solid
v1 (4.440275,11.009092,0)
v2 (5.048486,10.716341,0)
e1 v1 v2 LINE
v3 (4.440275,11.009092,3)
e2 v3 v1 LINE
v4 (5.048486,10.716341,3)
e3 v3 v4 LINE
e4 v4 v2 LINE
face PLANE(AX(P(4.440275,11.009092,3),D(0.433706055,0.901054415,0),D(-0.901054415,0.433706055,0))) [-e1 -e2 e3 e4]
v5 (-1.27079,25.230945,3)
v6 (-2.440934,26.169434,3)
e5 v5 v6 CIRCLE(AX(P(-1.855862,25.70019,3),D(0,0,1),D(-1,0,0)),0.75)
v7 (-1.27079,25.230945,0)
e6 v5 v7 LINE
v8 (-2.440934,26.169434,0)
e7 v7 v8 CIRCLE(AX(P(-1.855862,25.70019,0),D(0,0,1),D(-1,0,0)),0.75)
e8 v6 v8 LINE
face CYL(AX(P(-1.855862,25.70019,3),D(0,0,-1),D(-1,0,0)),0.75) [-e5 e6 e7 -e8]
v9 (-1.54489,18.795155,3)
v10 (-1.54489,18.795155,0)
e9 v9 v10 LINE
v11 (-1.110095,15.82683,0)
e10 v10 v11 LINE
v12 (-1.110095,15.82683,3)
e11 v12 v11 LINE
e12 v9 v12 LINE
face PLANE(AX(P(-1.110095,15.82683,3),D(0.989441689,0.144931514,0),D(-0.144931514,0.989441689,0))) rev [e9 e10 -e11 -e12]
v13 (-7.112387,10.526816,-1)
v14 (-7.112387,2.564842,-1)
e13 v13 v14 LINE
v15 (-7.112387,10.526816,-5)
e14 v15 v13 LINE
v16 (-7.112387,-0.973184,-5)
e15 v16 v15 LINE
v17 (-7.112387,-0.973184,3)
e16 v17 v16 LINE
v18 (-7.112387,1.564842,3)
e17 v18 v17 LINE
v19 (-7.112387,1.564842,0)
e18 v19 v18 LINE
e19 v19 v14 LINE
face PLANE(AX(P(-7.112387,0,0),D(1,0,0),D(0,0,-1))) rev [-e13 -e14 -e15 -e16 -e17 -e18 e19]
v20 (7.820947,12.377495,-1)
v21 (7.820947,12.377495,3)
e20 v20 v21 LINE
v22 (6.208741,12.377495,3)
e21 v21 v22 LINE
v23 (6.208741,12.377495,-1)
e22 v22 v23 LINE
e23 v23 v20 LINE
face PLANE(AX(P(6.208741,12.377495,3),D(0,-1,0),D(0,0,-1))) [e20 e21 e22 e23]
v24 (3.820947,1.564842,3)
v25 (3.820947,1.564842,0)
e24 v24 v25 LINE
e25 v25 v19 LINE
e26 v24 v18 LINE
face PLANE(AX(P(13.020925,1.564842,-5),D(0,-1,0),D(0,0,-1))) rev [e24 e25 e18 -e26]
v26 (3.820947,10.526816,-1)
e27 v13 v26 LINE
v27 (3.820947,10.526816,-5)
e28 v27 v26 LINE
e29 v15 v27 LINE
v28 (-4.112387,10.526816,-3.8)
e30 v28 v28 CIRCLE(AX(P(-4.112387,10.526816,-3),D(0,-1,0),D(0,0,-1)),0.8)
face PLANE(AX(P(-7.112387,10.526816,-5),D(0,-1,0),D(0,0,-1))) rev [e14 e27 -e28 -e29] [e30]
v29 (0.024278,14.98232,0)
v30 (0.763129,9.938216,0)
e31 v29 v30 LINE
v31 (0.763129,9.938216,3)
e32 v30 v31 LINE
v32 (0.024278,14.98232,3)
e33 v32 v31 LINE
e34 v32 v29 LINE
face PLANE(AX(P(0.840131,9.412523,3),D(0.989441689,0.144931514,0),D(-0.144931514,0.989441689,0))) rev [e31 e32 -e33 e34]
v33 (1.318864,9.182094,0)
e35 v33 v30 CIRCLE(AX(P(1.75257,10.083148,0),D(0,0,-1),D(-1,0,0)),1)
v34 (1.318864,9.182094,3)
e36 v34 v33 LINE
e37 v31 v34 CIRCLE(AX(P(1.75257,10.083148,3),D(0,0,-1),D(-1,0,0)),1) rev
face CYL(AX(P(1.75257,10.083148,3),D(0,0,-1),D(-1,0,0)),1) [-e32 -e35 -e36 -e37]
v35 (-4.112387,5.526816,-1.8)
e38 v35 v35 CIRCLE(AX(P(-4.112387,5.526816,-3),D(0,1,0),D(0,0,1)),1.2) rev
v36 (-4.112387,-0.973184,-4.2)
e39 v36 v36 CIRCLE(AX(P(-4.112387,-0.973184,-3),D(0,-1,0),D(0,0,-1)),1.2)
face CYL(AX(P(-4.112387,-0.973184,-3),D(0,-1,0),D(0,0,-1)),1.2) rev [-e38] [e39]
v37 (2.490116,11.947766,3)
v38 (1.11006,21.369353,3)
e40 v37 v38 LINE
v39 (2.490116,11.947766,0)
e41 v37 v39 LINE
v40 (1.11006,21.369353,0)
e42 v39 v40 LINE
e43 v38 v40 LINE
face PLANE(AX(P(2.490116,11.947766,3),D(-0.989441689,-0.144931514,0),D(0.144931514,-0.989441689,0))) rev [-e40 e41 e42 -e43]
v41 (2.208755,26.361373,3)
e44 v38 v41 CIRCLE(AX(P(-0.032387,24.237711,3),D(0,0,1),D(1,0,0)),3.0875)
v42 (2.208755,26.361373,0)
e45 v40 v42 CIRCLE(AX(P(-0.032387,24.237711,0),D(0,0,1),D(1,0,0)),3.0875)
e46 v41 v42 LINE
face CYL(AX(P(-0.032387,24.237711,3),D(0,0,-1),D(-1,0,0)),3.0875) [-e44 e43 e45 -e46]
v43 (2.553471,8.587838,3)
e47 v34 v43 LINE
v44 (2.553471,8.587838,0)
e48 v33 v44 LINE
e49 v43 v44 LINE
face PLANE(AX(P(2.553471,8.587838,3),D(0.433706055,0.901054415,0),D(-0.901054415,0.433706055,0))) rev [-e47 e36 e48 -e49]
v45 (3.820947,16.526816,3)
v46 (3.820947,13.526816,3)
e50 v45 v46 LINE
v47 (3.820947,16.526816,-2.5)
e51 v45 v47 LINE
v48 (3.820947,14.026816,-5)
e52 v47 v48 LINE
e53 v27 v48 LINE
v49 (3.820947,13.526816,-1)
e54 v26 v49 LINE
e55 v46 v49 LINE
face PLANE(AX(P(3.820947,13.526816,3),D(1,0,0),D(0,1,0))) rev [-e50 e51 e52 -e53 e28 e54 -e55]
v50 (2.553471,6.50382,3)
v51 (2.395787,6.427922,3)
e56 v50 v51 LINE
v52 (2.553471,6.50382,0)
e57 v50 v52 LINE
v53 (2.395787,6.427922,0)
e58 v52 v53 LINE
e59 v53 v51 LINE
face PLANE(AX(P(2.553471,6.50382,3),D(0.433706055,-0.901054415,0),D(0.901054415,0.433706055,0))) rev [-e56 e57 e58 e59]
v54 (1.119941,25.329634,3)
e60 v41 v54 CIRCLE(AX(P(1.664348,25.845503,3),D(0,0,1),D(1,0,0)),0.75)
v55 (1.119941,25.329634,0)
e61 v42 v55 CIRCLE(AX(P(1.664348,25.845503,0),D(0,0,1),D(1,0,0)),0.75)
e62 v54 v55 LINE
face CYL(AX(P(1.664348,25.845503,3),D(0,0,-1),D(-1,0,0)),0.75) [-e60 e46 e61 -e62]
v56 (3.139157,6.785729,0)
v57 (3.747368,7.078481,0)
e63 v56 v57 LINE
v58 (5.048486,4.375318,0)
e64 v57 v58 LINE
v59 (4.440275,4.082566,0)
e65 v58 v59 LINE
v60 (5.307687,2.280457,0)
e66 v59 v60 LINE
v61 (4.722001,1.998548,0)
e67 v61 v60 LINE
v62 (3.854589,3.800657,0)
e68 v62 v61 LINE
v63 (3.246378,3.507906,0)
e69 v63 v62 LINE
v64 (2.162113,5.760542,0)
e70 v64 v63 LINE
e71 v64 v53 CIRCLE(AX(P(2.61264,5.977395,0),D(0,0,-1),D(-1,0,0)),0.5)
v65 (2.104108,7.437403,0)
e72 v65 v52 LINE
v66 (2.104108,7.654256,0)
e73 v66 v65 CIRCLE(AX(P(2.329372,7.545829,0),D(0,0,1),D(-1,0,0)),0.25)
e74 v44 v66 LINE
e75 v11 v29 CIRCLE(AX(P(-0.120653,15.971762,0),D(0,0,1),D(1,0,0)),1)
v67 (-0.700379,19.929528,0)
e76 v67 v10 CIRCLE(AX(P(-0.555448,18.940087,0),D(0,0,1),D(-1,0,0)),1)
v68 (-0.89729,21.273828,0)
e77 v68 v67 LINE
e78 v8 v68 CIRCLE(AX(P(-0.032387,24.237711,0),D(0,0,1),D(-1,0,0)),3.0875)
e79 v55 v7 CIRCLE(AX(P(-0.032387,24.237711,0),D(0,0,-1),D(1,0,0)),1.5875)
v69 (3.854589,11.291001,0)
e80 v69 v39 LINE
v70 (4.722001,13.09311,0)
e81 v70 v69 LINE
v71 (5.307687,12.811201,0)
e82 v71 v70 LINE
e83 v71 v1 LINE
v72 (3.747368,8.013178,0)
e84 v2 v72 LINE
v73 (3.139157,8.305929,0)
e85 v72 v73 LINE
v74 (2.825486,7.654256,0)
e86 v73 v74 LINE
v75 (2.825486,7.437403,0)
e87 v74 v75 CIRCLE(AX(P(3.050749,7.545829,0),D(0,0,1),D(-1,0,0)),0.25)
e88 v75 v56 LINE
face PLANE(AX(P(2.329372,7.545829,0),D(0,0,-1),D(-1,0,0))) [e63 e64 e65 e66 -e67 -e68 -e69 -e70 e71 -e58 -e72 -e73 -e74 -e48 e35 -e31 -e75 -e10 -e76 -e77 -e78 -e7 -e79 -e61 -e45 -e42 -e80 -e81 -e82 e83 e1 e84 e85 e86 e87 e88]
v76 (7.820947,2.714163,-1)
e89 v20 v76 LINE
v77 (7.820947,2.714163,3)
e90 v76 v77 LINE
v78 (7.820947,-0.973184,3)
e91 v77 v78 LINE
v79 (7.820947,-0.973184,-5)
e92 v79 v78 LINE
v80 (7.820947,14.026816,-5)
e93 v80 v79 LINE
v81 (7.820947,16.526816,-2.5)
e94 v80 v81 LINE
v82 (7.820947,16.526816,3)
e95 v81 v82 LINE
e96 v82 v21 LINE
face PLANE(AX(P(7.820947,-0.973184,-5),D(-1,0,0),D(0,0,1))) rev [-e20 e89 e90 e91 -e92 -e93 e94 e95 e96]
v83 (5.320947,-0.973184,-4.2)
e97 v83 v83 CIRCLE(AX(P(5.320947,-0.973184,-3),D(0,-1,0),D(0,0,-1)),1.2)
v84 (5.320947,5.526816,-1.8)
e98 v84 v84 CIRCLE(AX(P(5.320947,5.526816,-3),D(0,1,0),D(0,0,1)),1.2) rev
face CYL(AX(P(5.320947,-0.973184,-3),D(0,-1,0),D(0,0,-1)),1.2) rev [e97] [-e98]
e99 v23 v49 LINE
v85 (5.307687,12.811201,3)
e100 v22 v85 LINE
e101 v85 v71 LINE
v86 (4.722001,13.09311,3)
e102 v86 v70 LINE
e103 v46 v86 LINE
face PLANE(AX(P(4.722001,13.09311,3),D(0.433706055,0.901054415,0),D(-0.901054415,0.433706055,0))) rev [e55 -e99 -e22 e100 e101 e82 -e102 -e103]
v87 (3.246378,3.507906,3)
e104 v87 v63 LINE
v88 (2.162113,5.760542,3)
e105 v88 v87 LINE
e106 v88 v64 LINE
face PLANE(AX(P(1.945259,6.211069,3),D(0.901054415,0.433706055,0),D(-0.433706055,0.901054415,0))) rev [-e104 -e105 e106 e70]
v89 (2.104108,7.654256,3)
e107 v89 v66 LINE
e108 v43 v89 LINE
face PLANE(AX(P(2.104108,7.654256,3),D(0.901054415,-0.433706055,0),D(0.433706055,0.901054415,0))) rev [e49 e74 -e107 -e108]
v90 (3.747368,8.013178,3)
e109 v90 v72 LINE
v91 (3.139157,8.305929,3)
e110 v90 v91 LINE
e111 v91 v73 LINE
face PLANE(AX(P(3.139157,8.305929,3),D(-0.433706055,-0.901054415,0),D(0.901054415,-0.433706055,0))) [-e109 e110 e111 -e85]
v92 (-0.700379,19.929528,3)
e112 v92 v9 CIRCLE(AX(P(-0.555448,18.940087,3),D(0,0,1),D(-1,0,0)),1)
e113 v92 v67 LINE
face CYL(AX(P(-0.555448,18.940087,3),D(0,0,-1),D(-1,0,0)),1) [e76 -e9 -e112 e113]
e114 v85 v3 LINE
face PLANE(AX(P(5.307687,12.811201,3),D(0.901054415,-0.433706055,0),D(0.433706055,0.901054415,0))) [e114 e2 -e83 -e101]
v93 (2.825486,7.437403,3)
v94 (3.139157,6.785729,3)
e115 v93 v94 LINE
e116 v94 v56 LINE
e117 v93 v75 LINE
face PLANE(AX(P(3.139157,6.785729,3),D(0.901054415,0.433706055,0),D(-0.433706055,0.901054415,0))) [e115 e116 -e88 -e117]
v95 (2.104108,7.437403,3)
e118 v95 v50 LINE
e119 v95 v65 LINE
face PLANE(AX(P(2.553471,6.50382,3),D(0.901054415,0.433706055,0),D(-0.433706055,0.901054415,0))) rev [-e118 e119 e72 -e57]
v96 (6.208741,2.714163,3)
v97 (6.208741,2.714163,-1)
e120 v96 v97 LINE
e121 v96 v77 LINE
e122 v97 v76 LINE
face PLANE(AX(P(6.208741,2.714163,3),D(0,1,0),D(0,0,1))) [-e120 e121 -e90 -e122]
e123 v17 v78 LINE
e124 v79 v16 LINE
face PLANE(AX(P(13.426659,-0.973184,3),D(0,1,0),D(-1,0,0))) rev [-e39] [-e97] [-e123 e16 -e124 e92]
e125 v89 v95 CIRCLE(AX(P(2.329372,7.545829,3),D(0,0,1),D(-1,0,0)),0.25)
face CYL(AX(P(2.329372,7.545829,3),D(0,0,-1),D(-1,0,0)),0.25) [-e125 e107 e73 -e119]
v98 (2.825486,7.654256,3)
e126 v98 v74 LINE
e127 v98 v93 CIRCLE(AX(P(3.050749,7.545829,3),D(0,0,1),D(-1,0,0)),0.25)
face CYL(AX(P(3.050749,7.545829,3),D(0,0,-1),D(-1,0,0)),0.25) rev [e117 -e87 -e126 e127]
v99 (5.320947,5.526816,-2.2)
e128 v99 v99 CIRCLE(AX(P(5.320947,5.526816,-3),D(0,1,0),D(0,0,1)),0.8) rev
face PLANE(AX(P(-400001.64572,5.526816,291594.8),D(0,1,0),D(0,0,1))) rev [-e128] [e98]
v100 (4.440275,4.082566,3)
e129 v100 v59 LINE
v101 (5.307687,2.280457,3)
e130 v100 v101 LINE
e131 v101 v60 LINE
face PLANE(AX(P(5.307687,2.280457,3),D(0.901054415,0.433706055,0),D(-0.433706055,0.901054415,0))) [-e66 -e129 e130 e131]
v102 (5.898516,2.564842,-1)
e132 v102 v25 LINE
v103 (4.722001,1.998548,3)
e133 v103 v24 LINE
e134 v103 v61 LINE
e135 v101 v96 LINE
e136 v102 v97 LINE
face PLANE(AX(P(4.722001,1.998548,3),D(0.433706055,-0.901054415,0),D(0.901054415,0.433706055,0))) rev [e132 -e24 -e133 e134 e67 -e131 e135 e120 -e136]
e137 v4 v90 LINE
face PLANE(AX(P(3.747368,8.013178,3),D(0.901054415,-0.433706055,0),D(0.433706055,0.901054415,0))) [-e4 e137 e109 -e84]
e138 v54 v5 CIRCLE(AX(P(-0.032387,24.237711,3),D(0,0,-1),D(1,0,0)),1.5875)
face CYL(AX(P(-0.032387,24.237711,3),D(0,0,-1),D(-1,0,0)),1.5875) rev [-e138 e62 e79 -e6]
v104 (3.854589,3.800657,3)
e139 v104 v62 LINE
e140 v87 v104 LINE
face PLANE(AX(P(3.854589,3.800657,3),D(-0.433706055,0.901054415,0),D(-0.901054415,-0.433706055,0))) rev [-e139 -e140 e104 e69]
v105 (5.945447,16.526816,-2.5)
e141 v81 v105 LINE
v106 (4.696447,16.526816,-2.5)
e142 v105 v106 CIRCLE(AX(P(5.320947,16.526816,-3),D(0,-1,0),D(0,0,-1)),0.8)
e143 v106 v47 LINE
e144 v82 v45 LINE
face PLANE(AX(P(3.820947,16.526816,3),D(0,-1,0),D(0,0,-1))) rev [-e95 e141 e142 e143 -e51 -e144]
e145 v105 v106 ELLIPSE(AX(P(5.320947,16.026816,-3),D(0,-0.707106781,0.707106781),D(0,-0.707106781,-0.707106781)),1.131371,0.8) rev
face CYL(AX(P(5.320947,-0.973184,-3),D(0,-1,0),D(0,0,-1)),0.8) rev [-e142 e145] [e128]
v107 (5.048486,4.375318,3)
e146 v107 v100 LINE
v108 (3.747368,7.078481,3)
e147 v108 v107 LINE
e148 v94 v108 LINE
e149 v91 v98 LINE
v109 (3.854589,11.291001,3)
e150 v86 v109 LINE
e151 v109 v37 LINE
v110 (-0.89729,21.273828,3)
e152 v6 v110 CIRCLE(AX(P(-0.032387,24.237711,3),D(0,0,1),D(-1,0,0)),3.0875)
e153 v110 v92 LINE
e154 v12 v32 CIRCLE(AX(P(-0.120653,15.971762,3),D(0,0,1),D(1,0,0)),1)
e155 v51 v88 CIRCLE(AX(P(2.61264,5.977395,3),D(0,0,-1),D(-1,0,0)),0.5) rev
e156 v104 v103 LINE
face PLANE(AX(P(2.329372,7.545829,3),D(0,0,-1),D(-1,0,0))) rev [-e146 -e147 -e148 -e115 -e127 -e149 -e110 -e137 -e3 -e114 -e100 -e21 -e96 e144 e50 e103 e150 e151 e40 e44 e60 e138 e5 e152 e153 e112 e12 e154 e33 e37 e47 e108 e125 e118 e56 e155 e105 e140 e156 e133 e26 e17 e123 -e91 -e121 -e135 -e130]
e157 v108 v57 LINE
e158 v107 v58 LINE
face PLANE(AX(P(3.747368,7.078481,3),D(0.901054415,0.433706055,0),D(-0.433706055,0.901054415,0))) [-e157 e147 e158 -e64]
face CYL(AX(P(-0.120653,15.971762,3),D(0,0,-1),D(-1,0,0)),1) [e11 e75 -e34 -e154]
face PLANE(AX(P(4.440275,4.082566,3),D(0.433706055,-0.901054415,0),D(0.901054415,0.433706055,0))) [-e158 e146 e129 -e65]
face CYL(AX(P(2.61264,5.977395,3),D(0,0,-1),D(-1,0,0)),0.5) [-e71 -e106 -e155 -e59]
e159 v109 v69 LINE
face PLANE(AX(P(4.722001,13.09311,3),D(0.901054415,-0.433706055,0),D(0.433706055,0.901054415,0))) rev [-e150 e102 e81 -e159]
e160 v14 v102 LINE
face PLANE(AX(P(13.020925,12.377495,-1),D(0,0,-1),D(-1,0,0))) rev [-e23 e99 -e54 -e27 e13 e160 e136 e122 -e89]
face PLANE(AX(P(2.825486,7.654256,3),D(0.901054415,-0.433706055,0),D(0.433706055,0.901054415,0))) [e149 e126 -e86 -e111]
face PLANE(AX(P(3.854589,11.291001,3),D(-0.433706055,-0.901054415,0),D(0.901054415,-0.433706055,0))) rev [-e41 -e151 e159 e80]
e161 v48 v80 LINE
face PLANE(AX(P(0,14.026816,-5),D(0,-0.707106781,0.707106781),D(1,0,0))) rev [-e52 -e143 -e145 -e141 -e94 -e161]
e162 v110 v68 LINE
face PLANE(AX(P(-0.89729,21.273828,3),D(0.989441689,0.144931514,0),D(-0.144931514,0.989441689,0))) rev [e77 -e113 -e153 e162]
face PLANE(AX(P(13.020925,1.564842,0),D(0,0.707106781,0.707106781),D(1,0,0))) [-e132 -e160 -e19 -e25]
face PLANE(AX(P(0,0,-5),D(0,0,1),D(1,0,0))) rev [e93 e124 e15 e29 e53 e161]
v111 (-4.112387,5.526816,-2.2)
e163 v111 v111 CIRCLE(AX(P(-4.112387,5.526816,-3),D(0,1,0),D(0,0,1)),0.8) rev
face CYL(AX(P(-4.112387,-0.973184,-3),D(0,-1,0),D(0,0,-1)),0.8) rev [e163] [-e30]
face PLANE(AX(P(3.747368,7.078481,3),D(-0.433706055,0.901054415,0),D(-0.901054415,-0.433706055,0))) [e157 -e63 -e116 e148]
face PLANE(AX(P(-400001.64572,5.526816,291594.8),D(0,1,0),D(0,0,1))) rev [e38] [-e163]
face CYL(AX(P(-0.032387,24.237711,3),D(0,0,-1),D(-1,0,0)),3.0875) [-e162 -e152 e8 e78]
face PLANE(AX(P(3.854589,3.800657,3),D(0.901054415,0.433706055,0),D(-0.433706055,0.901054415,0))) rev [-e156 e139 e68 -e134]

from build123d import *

# Parameters (mm, degrees)
BOSS_SWITCH_BODY_DEPTH        = 3
SKETCH1_W                     = 4
SKETCH1_H                     = 3.687347025
SKETCH1_H_2                   = 4.149321045
BOSS_FLANGE_WIDTH_DEPTH       = 5
BOSS_FLANGE_HEIGHT_REACH      = 35.973
SKETCH2_W                     = 4
SKETCH2_H                     = 4.149321045
SKETCH2_W_2                   = 8
SKETCH2_H_2                   = 2.53802598
SKETCH17_W                    = 14.933333866
SKETCH17_H                    = 4
BOSS_FLANGE_SUPPORT_DEPTH     = 10.812652975
CUT_WALL_GAP_DEPTH            = 1
SKETCH26_W                    = 10.933333866
SKETCH26_H                    = 6
CUT_CAM_SLOPE_CLEARANCE_DEPTH = 31.059873248
TAP_DRILL_FOR_M2X0_4_TAP1_D   = 1.6
M2_CLEARANCE_HOLE2_D          = 2.4
M2_CLEARANCE_HOLE2_DEPTH      = 6.5
CHAMFER_FLANGE_SUPPORT_3_SIZE = 1
SKETCH25_W                    = 5.60571229
SKETCH25_H                    = 17.5
CUT_BASE_REMOVAL_DEPTH        = 3
CHAMFER8_SIZE                 = 2.5
FILLET1_R                     = 1
FILLET2_R                     = 0.5


with BuildPart() as part:
    # Sketch-SwitchBossUp → Boss-Switch Body (new body)
    with BuildSketch(Plane.XY):
        with BuildLine():
            Line((-0.897289862, 21.27382814), (-0.700379438, 19.929528492))
            ThreePointArc((-0.700379438, 19.929528492), (-1.357570909, 19.537245674), (-1.544889614, 18.795155289))
            Line((-1.544889614, 18.795155289), (-1.110095072, 15.826830221))
            ThreePointArc((-1.110095072, 15.826830221), (-0.717812255, 15.169638751), (0.02427813, 14.982320046))
            Line((0.02427813, 14.982320046), (0.840131285, 9.412522958))
            Line((0.840131285, 9.412522958), (1.945259485, 8.880589721))
            Line((1.945259485, 8.880589721), (2.553471215, 8.587838134))
            Line((2.553471215, 8.587838134), (2.104108424, 7.654255765))
            ThreePointArc((2.104108424, 7.654255765), (2.079372028, 7.545829251), (2.104108424, 7.437402737))
            Line((2.104108424, 7.437402737), (2.553471215, 6.503820369))
            Line((2.553471215, 6.503820369), (1.945259485, 6.211068782))
            Line((1.945259485, 6.211068782), (3.246377649, 3.507905538))
            Line((3.246377649, 3.507905538), (3.854589379, 3.800657125))
            Line((3.854589379, 3.800657125), (4.722001489, 1.998548296))
            Line((4.722001489, 1.998548296), (3.820947074, 1.564842241))
            Line((3.820947074, 1.564842241), (3.820947074, -0.973183739))
            Line((3.820947074, -0.973183739), (5.277352178, -0.973183739))
            Line((5.277352178, -0.973183739), (13.426659364, -0.973183739))
            Line((13.426659364, -0.973183739), (13.426659364, 16.526816261))
            Line((13.426659364, 16.526816261), (7.114618425, 16.526816261))
            Line((7.114618425, 16.526816261), (3.820947074, 16.526816261))
            Line((3.820947074, 16.526816261), (3.820947074, 13.526816261))
            Line((3.820947074, 13.526816261), (4.722001489, 13.093110206))
            Line((4.722001489, 13.093110206), (3.854589379, 11.291001377))
            Line((3.854589379, 11.291001377), (2.490115752, 11.94776579))
            Line((2.490115752, 11.94776579), (1.110059725, 21.369353491))
            ThreePointArc((1.110059725, 21.369353491), (2.982945849, 23.574065074), (2.208754741, 26.361372687))
            ThreePointArc((2.208754741, 26.361372687), (1.148478545, 26.389910192), (1.119941041, 25.329633996))
            ThreePointArc((1.119941041, 25.329633996), (0.033089246, 22.651561394), (-1.270789677, 25.230944933))
            ThreePointArc((-1.270789677, 25.230944933), (-1.386617314, 26.285261754), (-2.440934135, 26.169434117))
            ThreePointArc((-2.440934135, 26.169434117), (-2.976976555, 23.309245483), (-0.897289862, 21.27382814))
        make_face()
        with BuildLine():
            Line((6.208741273, 2.714163286), (10.695012416, 2.714163286))
            Line((10.695012416, 2.714163286), (10.695012416, 12.377495216))
            Line((10.695012416, 12.377495216), (6.208741273, 12.377495216))
            Line((6.208741273, 12.377495216), (5.307686858, 12.811201271))
            Line((5.307686858, 12.811201271), (4.440274749, 11.009092442))
            Line((4.440274749, 11.009092442), (5.048486478, 10.716340855))
            Line((5.048486478, 10.716340855), (3.747368314, 8.013177611))
            Line((3.747368314, 8.013177611), (3.139156584, 8.305929198))
            Line((3.139156584, 8.305929198), (2.825485502, 7.654255765))
            ThreePointArc((2.825485502, 7.654255765), (2.800749105, 7.545829251), (2.825485502, 7.437402737))
            Line((2.825485502, 7.437402737), (3.139156584, 6.785729304))
            Line((3.139156584, 6.785729304), (3.747368314, 7.078480891))
            Line((3.747368314, 7.078480891), (5.048486478, 4.375317648))
            Line((5.048486478, 4.375317648), (4.440274749, 4.082566061))
            Line((4.440274749, 4.082566061), (5.307686858, 2.280457231))
            Line((5.307686858, 2.280457231), (6.208741273, 2.714163286))
        make_face(mode=Mode.SUBTRACT)
    extrude(amount=BOSS_SWITCH_BODY_DEPTH)

    # Sketch1 → Boss-Flange Width (add)
    with BuildSketch(Plane(origin=(0, 0, 0), x_dir=(-1, 0, 0), z_dir=(0, 0, -1))):
        with Locations((-5.820947074, 0.870489774)):
            Rectangle(SKETCH1_W, SKETCH1_H)
        with Locations((-5.820947074, 14.452155739)):
            Rectangle(SKETCH1_W, SKETCH1_H_2)
    extrude(amount=BOSS_FLANGE_WIDTH_DEPTH)

    # Sketch2 → Boss-Flange Height (add, up to next)
    with BuildSketch(Plane(origin=(-7.112386792, 0, 0), x_dir=(0, 0, -1), z_dir=(1, 0, 0)), mode=Mode.PRIVATE) as boss_flange_height_sk1:
        with Locations((3, 14.452155739)):
            Rectangle(SKETCH2_W, SKETCH2_H)
    boss_flange_height_tool1 = extrude(boss_flange_height_sk1.sketch, amount=BOSS_FLANGE_HEIGHT_REACH, mode=Mode.PRIVATE) - part.part
    # Sketch2 → Boss-Flange Height (add, up to next)
    with BuildSketch(Plane(origin=(-7.112386792, 0, 0), x_dir=(0, 0, -1), z_dir=(1, 0, 0)), mode=Mode.PRIVATE) as boss_flange_height_sk2:
        with Locations((1, 0.295829251)):
            Rectangle(SKETCH2_W_2, SKETCH2_H_2)
    boss_flange_height_tool2 = extrude(boss_flange_height_sk2.sketch, amount=BOSS_FLANGE_HEIGHT_REACH, mode=Mode.PRIVATE) - part.part
    add(boss_flange_height_tool1.solids().sort_by_distance((-7.112387, 14.452156, -3))[0])
    add(boss_flange_height_tool2.solids().sort_by_distance((-7.112387, 0.295829, -1))[0])

    # Sketch17 → Boss-Flange Support (add)
    with BuildSketch(Plane.XZ.offset(-1.564842241)):
        with Locations((0.354280141, -3)):
            Rectangle(SKETCH17_W, SKETCH17_H)
    extrude(amount=-BOSS_FLANGE_SUPPORT_DEPTH)

    # Sketch27 → Cut-Wall Gap (cut)
    with BuildSketch(Plane.XY):
        Polygon((3.820947074, 13.526816261), (6.208741273, 12.377495216), (3.820947074, 12.377495216), align=None)
        Polygon((6.208741273, 2.714163286), (3.820947074, 2.714163286), (3.820947074, 1.564842241), align=None)
    extrude(amount=-CUT_WALL_GAP_DEPTH, mode=Mode.SUBTRACT)

    # Sketch26 → Cut-Cam Slope Clearance (cut, through all)
    with BuildSketch(Plane.XY.offset(-1)):
        with Locations((-1.645719859, 13.526816261)):
            Rectangle(SKETCH26_W, SKETCH26_H)
    extrude(amount=-CUT_CAM_SLOPE_CLEARANCE_DEPTH, mode=Mode.SUBTRACT)

    # Tap Drill for M2x0.4 Tap1 (through all)
    with Locations(Plane(origin=(0, -0.973183739, 0), x_dir=(-1, 0, 0), z_dir=(0, -1, 0))):
        with Locations((4.112386792, 3), (-5.320947074, 3)):
            Hole(TAP_DRILL_FOR_M2X0_4_TAP1_D / 2)

    # M2 Clearance Hole2
    with Locations(Plane.XZ.offset(0.973183739)):
        with Locations((-4.112386792, -3), (5.320947074, -3)):
            Hole(M2_CLEARANCE_HOLE2_D / 2, depth=M2_CLEARANCE_HOLE2_DEPTH)

    # Chamfer-Flange Support 3
    chamfer_flange_support_3_edges = [part.edges().sort_by_distance(p)[0] for p in [
        (-1.645719859, 1.564842241, -1),
    ]]
    chamfer(chamfer_flange_support_3_edges, length=CHAMFER_FLANGE_SUPPORT_3_SIZE)

    # Sketch25 → Cut-Base Removal (cut)
    with BuildSketch(Plane.XY.offset(3)):
        with Locations((10.623803219, 7.776816261)):
            Rectangle(SKETCH25_W, SKETCH25_H)
    extrude(amount=-CUT_BASE_REMOVAL_DEPTH, mode=Mode.SUBTRACT)

    # Chamfer8
    # the kernel refuses this chamfer: 2.5 mm, written as the material it takes off along each edge
    with BuildSketch(Plane(origin=(14.250154544, 16.526816261, -5), x_dir=(0, 0.027495876610586317, 0.9996219169112968), z_dir=(-1, 0, 0))) as chamfer8_piece_1:
        Polygon((CHAMFER8_SIZE * 0.999621916911, -CHAMFER8_SIZE * 0.0274958766106), (-CHAMFER8_SIZE * 0.0274958766106, -CHAMFER8_SIZE * 0.999621916911), (0, 0), align=None)
    extrude(amount=16.85841494, mode=Mode.SUBTRACT)

    # Fillet1
    fillet1_edges = [part.edges().sort_by_distance(p)[0] for p in [
        (0.840131285, 9.412522958, 1.5),
    ]]
    fillet(fillet1_edges, radius=FILLET1_R)

    # Fillet2
    fillet2_edges = [part.edges().sort_by_distance(p)[0] for p in [
        (1.945259485, 6.211068782, 1.5),
    ]]
    fillet(fillet2_edges, radius=FILLET2_R)


solid = part.part
